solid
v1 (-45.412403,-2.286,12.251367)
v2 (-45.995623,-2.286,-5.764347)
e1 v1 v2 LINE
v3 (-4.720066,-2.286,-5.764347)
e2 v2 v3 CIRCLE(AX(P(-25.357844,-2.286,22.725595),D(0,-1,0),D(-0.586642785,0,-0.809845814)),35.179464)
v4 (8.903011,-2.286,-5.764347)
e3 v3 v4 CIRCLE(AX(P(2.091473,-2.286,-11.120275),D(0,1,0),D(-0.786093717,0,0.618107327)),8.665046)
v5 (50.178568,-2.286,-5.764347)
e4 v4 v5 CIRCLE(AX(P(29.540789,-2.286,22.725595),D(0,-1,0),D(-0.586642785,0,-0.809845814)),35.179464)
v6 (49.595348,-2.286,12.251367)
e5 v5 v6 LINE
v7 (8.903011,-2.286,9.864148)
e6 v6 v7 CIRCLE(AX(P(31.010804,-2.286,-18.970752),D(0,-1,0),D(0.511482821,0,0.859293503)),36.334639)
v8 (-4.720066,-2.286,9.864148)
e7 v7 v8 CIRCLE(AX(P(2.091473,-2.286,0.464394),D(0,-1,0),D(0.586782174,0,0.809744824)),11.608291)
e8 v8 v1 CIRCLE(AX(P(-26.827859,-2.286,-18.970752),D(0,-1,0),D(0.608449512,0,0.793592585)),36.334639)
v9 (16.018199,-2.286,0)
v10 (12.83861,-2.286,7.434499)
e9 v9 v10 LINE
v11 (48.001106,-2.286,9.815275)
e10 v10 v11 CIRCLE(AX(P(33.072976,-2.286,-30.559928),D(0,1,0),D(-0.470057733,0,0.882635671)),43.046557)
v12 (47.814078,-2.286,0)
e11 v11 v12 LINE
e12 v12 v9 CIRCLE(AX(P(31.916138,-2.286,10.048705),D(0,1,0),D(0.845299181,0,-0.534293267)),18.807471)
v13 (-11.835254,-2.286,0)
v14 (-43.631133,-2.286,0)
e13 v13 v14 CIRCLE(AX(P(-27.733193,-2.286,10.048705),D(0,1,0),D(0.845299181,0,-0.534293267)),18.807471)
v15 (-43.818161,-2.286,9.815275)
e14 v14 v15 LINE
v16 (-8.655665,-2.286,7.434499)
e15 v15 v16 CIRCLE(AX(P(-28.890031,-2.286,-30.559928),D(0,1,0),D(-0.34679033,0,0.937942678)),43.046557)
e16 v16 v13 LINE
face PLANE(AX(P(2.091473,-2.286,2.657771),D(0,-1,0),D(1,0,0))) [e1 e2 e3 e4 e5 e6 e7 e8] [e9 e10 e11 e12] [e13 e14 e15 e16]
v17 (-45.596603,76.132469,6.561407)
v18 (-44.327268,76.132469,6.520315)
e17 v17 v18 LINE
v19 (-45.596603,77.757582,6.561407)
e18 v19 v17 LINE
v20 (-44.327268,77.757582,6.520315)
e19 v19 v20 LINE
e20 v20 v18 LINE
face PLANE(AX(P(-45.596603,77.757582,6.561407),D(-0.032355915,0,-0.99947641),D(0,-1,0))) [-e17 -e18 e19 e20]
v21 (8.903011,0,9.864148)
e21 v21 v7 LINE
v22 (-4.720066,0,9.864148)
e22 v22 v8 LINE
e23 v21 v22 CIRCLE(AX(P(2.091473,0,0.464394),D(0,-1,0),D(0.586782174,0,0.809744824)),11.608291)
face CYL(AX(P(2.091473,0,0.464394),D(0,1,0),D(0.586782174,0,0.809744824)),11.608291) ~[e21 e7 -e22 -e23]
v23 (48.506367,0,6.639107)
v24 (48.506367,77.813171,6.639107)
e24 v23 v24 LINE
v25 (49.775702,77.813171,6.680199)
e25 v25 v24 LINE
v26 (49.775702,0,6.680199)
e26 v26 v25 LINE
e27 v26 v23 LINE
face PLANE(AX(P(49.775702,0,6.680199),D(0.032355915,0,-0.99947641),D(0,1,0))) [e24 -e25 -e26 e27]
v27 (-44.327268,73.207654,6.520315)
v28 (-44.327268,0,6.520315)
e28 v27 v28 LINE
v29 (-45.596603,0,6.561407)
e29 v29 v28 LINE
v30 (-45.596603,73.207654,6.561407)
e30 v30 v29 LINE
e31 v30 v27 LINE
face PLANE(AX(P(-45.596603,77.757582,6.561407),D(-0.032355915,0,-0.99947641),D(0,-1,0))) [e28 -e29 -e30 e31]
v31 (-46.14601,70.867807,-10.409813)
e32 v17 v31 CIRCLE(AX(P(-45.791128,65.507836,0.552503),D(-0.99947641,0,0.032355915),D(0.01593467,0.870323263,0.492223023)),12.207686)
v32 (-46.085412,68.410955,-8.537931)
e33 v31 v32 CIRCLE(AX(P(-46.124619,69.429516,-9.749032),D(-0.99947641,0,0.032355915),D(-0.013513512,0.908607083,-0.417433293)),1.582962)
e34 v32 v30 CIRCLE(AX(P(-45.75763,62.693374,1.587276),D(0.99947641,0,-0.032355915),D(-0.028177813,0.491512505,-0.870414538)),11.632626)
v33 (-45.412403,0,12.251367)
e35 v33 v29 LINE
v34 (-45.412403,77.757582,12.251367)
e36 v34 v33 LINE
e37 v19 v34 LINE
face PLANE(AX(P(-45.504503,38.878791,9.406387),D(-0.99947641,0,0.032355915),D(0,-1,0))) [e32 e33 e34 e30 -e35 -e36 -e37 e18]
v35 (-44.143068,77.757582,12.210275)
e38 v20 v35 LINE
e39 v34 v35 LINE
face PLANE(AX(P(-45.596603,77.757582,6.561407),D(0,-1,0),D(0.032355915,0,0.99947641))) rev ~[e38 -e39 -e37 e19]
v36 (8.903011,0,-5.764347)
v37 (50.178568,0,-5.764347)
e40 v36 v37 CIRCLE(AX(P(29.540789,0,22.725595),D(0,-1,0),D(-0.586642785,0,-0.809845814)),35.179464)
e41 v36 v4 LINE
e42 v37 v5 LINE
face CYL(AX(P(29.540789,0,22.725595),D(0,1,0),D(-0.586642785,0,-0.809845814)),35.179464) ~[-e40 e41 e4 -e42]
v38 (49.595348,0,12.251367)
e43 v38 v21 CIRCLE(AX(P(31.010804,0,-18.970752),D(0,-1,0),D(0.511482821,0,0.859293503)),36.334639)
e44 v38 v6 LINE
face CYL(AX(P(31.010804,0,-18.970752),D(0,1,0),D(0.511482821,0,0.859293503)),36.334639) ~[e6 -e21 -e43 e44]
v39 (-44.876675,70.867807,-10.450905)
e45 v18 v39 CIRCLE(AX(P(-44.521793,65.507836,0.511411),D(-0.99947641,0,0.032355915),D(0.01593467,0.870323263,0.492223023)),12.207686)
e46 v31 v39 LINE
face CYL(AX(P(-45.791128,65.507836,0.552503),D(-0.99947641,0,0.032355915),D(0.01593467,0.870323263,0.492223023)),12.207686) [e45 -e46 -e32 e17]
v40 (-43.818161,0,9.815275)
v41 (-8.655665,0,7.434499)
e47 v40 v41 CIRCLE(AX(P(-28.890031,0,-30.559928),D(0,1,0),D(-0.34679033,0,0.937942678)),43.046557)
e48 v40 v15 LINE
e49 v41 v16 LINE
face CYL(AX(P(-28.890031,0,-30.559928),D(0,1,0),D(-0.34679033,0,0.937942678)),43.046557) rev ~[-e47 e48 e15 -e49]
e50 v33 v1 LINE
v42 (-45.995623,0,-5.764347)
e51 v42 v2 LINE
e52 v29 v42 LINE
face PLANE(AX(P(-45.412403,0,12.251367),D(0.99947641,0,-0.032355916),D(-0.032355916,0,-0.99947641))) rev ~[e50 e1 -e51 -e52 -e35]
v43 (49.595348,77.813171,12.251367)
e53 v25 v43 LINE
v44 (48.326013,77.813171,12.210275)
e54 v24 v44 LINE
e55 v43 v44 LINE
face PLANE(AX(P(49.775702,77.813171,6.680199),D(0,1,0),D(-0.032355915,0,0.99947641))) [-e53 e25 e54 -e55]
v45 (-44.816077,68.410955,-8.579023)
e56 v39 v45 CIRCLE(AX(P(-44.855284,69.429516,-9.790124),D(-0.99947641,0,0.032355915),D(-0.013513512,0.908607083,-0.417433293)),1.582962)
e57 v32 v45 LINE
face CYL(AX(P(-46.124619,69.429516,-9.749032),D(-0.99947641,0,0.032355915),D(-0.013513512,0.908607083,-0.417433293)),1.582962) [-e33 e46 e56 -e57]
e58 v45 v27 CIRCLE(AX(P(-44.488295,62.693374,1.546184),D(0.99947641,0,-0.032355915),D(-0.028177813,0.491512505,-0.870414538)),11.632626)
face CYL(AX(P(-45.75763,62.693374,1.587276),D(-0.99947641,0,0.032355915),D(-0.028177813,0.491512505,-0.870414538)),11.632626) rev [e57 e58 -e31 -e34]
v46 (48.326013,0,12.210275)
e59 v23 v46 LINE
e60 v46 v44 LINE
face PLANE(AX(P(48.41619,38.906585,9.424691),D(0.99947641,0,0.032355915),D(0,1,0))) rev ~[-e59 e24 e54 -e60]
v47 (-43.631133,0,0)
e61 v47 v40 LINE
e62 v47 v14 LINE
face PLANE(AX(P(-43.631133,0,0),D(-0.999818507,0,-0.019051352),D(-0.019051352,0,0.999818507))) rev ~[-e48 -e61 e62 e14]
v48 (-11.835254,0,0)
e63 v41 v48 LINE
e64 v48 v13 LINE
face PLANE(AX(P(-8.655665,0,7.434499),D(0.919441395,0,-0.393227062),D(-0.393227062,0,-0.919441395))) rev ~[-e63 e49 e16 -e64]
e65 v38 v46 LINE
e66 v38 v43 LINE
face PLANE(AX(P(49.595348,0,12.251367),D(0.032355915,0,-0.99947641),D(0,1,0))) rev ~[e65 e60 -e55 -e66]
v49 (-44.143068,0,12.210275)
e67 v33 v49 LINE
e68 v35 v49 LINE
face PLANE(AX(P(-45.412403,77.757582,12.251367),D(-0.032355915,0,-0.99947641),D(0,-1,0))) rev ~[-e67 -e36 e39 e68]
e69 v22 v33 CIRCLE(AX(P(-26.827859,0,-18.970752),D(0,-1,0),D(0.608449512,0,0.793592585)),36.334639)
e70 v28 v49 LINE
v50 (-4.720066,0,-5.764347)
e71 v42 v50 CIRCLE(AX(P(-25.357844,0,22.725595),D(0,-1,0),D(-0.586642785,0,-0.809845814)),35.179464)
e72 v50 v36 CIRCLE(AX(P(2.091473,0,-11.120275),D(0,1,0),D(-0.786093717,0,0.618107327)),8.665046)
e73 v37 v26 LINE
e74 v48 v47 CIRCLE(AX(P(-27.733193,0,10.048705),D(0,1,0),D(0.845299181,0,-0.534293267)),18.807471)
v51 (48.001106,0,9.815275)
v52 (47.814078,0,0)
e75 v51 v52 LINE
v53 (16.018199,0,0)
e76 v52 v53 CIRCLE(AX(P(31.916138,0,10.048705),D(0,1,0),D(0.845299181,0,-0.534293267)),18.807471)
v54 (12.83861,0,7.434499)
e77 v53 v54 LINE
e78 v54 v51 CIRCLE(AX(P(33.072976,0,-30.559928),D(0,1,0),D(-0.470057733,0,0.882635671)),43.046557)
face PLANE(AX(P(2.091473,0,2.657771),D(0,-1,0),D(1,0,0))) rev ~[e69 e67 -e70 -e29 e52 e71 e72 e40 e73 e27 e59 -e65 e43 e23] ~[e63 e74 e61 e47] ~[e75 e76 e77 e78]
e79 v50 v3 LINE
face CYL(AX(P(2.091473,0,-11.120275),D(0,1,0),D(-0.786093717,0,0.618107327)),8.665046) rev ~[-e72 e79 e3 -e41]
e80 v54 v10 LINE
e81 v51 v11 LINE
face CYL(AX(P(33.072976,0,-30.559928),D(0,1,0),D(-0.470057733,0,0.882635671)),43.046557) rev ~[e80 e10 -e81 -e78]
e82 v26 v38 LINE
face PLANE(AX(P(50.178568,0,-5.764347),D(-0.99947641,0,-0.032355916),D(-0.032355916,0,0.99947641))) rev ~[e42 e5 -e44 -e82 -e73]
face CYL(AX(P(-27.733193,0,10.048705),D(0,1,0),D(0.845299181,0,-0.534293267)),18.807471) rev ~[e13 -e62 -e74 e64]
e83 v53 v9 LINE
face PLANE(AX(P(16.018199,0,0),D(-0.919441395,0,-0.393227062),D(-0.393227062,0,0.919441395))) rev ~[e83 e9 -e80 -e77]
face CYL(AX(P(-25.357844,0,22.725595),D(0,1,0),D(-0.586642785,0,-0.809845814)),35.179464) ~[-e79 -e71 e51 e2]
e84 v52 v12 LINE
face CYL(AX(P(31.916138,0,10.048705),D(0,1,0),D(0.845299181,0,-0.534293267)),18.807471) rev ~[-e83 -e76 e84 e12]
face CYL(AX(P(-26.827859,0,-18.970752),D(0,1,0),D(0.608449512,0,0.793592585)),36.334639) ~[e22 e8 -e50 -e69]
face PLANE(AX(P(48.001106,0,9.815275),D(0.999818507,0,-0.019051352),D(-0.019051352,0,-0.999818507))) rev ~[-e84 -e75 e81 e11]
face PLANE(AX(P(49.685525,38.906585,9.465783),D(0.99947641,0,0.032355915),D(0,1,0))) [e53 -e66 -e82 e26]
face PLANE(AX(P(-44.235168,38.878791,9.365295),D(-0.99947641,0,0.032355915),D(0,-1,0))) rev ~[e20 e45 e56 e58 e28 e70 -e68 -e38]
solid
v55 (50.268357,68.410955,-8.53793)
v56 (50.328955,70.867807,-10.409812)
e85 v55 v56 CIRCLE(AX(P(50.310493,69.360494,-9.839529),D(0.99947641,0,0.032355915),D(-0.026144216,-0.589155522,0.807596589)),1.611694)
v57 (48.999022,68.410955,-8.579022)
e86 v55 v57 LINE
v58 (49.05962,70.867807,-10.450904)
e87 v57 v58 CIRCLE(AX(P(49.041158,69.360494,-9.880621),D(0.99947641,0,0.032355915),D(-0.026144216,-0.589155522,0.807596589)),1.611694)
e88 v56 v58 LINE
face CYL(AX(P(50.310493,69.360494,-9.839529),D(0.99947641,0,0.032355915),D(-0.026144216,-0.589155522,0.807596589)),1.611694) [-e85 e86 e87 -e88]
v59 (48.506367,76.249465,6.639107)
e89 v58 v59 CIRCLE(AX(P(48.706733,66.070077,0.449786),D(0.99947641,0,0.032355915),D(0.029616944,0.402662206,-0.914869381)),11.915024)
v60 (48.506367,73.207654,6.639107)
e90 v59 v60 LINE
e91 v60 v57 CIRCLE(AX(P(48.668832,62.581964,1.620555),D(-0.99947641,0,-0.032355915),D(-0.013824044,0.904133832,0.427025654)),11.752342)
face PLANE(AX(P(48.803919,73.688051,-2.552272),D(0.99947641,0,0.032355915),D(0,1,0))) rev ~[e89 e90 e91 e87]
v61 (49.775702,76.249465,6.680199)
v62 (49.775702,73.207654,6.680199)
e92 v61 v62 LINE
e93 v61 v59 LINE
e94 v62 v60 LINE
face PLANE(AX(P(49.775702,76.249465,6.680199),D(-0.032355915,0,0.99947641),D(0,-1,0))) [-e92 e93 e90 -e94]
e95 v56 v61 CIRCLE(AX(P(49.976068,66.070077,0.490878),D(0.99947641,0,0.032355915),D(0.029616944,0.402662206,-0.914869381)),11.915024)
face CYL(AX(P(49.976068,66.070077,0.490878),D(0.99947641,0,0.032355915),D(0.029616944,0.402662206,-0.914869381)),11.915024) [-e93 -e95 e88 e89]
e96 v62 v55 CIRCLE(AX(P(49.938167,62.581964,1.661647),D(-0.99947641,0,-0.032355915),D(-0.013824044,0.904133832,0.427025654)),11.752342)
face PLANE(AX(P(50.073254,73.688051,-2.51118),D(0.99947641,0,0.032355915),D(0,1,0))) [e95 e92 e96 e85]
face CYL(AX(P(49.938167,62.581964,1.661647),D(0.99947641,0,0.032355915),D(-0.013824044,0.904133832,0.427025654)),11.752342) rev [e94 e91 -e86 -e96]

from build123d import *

# Parameters (mm, degrees)
F1_DEPTH  = 2.286
F2_W      = 77.7575820684
F2_H      = 5.6929403374
F3_DEPTH  = 1.27
F4_W      = 77.8131708503
F4_H      = 5.5740863885
F5_DEPTH  = 1.27
F11_DEPTH = 1.27
F12_DEPTH = 1.27


# Not quite as in the source:
# - the program builds the solid bodies; features that only make, move or delete a surface that nothing else refers to are left out


with BuildPart() as f1:
    # F0 (on Front) → F1 (new body)
    with BuildSketch(Plane.XZ):
        with BuildLine():
            ThreePointArc((49.5953476056, 12.2513668612), (28.882888205, 17.3015230489), (8.9030108118, 9.8641477525))
            ThreePointArc((8.9030108118, 9.8641477525), (2.0914725028, 12.0726852219), (-4.7200658062, 9.8641477525))
            ThreePointArc((-4.7200658062, 9.8641477525), (-24.6999431994, 17.3015230489), (-45.4124026, 12.2513668612))
            Line((-45.4124026, 12.2513668612), (-45.9956228733, -5.7643466812))
            ThreePointArc((-45.9956228733, -5.7643466812), (-25.3578443398, -12.4538689532), (-4.7200658062, -5.7643466812))
            ThreePointArc((-4.7200658062, -5.7643466812), (2.0914725028, -2.4552290608), (8.9030108118, -5.7643466812))
            ThreePointArc((8.9030108118, -5.7643466812), (29.5407893454, -12.4538689532), (50.1785678789, -5.7643466812))
            Line((50.1785678789, -5.7643466812), (49.5953476056, 12.2513668612))
        make_face()
        with BuildLine():
            ThreePointArc((-43.8181608915, 9.8152747378), (-25.9821003979, 12.388296488), (-8.655664511, 7.4344985187))
            Line((-8.655664511, 7.4344985187), (-11.8352537975, 0))
            ThreePointArc((-11.8352537975, 0), (-27.7331932448, -8.7587656644), (-43.6311326921, 0))
            Line((-43.6311326921, 0), (-43.8181608915, 9.8152747378))
        make_face(mode=Mode.SUBTRACT)
        with BuildLine():
            Line((48.0011058971, 9.8152747378), (47.8140776977, 0))
            ThreePointArc((47.8140776977, 0), (31.9161382504, -8.7587656644), (16.0181988031, 0))
            Line((16.0181988031, 0), (12.8386095166, 7.4344985187))
            ThreePointArc((12.8386095166, 7.4344985187), (30.1650454035, 12.388296488), (48.0011058971, 9.8152747378))
        make_face(mode=Mode.SUBTRACT)
    extrude(amount=F1_DEPTH)

    # F2 (on face) → F3 (join)
    with BuildSketch(Plane(origin=(-45.7610567543, 0, 1.4814165402), x_dir=(0, -1, 0), z_dir=(-0.9994764103, 0, 0.0323559155))):
        with Locations((-38.8787910342, 7.9291221415)):
            Rectangle(F2_W, F2_H)
    extrude(amount=-F3_DEPTH)

    # F4 (on face) → F5 (join)
    with BuildSketch(Plane(origin=(49.9396226128, 0, 1.6166886911), x_dir=(0, 1, 0), z_dir=(0.9994764103, 0, 0.0323559155))):
        with Locations((38.9065854251, 7.8532061008)):
            Rectangle(F4_W, F4_H)
    extrude(amount=-F5_DEPTH)

    # F10 (on face) → F11 (join)
    with BuildSketch(Plane(origin=(-45.7610567543, 0, 1.4814165402), x_dir=(0, -1, 0), z_dir=(-0.9994764103, 0, 0.0323559155))):
        with BuildLine():
            ThreePointArc((-68.4109553695, -10.0245960057), (-73.7805543262, -3.4143727695), (-73.2076540589, 5.0826519728))
            Line((-73.2076540589, 5.0826519728), (-76.1324688792, 5.0826519728))
            ThreePointArc((-76.1324688792, 5.0826519728), (-77.1679356937, -4.5445995463), (-70.867806673, -11.8974586949))
            ThreePointArc((-70.867806673, -11.8974586949), (-68.4698563349, -12.4952285851), (-68.4109553695, -10.0245960057))
        make_face()
    extrude(amount=-F11_DEPTH)


with BuildPart() as f12:
    # F9 (on face) → F12 (new body)
    with BuildSketch(Plane(origin=(49.9396226128, 0, 1.6166886911), x_dir=(0, 1, 0), z_dir=(0.9994764103, 0, 0.0323559155))):
        with BuildLine():
            ThreePointArc((68.4109553695, -10.1599385962), (68.3834154508, -12.7439657132), (70.867806673, -12.0328012854))
            ThreePointArc((70.867806673, -12.0328012854), (77.4354700769, -4.7034982276), (76.2494653463, 5.0661629066))
            Line((76.2494653463, 5.0661629066), (73.2076540589, 5.0661629066))
            ThreePointArc((73.2076540589, 5.0661629066), (73.7912313756, -3.4862881047), (68.4109553695, -10.1599385962))
        make_face()
    extrude(amount=-F12_DEPTH)


solid = Compound([f1.part, f12.part])
